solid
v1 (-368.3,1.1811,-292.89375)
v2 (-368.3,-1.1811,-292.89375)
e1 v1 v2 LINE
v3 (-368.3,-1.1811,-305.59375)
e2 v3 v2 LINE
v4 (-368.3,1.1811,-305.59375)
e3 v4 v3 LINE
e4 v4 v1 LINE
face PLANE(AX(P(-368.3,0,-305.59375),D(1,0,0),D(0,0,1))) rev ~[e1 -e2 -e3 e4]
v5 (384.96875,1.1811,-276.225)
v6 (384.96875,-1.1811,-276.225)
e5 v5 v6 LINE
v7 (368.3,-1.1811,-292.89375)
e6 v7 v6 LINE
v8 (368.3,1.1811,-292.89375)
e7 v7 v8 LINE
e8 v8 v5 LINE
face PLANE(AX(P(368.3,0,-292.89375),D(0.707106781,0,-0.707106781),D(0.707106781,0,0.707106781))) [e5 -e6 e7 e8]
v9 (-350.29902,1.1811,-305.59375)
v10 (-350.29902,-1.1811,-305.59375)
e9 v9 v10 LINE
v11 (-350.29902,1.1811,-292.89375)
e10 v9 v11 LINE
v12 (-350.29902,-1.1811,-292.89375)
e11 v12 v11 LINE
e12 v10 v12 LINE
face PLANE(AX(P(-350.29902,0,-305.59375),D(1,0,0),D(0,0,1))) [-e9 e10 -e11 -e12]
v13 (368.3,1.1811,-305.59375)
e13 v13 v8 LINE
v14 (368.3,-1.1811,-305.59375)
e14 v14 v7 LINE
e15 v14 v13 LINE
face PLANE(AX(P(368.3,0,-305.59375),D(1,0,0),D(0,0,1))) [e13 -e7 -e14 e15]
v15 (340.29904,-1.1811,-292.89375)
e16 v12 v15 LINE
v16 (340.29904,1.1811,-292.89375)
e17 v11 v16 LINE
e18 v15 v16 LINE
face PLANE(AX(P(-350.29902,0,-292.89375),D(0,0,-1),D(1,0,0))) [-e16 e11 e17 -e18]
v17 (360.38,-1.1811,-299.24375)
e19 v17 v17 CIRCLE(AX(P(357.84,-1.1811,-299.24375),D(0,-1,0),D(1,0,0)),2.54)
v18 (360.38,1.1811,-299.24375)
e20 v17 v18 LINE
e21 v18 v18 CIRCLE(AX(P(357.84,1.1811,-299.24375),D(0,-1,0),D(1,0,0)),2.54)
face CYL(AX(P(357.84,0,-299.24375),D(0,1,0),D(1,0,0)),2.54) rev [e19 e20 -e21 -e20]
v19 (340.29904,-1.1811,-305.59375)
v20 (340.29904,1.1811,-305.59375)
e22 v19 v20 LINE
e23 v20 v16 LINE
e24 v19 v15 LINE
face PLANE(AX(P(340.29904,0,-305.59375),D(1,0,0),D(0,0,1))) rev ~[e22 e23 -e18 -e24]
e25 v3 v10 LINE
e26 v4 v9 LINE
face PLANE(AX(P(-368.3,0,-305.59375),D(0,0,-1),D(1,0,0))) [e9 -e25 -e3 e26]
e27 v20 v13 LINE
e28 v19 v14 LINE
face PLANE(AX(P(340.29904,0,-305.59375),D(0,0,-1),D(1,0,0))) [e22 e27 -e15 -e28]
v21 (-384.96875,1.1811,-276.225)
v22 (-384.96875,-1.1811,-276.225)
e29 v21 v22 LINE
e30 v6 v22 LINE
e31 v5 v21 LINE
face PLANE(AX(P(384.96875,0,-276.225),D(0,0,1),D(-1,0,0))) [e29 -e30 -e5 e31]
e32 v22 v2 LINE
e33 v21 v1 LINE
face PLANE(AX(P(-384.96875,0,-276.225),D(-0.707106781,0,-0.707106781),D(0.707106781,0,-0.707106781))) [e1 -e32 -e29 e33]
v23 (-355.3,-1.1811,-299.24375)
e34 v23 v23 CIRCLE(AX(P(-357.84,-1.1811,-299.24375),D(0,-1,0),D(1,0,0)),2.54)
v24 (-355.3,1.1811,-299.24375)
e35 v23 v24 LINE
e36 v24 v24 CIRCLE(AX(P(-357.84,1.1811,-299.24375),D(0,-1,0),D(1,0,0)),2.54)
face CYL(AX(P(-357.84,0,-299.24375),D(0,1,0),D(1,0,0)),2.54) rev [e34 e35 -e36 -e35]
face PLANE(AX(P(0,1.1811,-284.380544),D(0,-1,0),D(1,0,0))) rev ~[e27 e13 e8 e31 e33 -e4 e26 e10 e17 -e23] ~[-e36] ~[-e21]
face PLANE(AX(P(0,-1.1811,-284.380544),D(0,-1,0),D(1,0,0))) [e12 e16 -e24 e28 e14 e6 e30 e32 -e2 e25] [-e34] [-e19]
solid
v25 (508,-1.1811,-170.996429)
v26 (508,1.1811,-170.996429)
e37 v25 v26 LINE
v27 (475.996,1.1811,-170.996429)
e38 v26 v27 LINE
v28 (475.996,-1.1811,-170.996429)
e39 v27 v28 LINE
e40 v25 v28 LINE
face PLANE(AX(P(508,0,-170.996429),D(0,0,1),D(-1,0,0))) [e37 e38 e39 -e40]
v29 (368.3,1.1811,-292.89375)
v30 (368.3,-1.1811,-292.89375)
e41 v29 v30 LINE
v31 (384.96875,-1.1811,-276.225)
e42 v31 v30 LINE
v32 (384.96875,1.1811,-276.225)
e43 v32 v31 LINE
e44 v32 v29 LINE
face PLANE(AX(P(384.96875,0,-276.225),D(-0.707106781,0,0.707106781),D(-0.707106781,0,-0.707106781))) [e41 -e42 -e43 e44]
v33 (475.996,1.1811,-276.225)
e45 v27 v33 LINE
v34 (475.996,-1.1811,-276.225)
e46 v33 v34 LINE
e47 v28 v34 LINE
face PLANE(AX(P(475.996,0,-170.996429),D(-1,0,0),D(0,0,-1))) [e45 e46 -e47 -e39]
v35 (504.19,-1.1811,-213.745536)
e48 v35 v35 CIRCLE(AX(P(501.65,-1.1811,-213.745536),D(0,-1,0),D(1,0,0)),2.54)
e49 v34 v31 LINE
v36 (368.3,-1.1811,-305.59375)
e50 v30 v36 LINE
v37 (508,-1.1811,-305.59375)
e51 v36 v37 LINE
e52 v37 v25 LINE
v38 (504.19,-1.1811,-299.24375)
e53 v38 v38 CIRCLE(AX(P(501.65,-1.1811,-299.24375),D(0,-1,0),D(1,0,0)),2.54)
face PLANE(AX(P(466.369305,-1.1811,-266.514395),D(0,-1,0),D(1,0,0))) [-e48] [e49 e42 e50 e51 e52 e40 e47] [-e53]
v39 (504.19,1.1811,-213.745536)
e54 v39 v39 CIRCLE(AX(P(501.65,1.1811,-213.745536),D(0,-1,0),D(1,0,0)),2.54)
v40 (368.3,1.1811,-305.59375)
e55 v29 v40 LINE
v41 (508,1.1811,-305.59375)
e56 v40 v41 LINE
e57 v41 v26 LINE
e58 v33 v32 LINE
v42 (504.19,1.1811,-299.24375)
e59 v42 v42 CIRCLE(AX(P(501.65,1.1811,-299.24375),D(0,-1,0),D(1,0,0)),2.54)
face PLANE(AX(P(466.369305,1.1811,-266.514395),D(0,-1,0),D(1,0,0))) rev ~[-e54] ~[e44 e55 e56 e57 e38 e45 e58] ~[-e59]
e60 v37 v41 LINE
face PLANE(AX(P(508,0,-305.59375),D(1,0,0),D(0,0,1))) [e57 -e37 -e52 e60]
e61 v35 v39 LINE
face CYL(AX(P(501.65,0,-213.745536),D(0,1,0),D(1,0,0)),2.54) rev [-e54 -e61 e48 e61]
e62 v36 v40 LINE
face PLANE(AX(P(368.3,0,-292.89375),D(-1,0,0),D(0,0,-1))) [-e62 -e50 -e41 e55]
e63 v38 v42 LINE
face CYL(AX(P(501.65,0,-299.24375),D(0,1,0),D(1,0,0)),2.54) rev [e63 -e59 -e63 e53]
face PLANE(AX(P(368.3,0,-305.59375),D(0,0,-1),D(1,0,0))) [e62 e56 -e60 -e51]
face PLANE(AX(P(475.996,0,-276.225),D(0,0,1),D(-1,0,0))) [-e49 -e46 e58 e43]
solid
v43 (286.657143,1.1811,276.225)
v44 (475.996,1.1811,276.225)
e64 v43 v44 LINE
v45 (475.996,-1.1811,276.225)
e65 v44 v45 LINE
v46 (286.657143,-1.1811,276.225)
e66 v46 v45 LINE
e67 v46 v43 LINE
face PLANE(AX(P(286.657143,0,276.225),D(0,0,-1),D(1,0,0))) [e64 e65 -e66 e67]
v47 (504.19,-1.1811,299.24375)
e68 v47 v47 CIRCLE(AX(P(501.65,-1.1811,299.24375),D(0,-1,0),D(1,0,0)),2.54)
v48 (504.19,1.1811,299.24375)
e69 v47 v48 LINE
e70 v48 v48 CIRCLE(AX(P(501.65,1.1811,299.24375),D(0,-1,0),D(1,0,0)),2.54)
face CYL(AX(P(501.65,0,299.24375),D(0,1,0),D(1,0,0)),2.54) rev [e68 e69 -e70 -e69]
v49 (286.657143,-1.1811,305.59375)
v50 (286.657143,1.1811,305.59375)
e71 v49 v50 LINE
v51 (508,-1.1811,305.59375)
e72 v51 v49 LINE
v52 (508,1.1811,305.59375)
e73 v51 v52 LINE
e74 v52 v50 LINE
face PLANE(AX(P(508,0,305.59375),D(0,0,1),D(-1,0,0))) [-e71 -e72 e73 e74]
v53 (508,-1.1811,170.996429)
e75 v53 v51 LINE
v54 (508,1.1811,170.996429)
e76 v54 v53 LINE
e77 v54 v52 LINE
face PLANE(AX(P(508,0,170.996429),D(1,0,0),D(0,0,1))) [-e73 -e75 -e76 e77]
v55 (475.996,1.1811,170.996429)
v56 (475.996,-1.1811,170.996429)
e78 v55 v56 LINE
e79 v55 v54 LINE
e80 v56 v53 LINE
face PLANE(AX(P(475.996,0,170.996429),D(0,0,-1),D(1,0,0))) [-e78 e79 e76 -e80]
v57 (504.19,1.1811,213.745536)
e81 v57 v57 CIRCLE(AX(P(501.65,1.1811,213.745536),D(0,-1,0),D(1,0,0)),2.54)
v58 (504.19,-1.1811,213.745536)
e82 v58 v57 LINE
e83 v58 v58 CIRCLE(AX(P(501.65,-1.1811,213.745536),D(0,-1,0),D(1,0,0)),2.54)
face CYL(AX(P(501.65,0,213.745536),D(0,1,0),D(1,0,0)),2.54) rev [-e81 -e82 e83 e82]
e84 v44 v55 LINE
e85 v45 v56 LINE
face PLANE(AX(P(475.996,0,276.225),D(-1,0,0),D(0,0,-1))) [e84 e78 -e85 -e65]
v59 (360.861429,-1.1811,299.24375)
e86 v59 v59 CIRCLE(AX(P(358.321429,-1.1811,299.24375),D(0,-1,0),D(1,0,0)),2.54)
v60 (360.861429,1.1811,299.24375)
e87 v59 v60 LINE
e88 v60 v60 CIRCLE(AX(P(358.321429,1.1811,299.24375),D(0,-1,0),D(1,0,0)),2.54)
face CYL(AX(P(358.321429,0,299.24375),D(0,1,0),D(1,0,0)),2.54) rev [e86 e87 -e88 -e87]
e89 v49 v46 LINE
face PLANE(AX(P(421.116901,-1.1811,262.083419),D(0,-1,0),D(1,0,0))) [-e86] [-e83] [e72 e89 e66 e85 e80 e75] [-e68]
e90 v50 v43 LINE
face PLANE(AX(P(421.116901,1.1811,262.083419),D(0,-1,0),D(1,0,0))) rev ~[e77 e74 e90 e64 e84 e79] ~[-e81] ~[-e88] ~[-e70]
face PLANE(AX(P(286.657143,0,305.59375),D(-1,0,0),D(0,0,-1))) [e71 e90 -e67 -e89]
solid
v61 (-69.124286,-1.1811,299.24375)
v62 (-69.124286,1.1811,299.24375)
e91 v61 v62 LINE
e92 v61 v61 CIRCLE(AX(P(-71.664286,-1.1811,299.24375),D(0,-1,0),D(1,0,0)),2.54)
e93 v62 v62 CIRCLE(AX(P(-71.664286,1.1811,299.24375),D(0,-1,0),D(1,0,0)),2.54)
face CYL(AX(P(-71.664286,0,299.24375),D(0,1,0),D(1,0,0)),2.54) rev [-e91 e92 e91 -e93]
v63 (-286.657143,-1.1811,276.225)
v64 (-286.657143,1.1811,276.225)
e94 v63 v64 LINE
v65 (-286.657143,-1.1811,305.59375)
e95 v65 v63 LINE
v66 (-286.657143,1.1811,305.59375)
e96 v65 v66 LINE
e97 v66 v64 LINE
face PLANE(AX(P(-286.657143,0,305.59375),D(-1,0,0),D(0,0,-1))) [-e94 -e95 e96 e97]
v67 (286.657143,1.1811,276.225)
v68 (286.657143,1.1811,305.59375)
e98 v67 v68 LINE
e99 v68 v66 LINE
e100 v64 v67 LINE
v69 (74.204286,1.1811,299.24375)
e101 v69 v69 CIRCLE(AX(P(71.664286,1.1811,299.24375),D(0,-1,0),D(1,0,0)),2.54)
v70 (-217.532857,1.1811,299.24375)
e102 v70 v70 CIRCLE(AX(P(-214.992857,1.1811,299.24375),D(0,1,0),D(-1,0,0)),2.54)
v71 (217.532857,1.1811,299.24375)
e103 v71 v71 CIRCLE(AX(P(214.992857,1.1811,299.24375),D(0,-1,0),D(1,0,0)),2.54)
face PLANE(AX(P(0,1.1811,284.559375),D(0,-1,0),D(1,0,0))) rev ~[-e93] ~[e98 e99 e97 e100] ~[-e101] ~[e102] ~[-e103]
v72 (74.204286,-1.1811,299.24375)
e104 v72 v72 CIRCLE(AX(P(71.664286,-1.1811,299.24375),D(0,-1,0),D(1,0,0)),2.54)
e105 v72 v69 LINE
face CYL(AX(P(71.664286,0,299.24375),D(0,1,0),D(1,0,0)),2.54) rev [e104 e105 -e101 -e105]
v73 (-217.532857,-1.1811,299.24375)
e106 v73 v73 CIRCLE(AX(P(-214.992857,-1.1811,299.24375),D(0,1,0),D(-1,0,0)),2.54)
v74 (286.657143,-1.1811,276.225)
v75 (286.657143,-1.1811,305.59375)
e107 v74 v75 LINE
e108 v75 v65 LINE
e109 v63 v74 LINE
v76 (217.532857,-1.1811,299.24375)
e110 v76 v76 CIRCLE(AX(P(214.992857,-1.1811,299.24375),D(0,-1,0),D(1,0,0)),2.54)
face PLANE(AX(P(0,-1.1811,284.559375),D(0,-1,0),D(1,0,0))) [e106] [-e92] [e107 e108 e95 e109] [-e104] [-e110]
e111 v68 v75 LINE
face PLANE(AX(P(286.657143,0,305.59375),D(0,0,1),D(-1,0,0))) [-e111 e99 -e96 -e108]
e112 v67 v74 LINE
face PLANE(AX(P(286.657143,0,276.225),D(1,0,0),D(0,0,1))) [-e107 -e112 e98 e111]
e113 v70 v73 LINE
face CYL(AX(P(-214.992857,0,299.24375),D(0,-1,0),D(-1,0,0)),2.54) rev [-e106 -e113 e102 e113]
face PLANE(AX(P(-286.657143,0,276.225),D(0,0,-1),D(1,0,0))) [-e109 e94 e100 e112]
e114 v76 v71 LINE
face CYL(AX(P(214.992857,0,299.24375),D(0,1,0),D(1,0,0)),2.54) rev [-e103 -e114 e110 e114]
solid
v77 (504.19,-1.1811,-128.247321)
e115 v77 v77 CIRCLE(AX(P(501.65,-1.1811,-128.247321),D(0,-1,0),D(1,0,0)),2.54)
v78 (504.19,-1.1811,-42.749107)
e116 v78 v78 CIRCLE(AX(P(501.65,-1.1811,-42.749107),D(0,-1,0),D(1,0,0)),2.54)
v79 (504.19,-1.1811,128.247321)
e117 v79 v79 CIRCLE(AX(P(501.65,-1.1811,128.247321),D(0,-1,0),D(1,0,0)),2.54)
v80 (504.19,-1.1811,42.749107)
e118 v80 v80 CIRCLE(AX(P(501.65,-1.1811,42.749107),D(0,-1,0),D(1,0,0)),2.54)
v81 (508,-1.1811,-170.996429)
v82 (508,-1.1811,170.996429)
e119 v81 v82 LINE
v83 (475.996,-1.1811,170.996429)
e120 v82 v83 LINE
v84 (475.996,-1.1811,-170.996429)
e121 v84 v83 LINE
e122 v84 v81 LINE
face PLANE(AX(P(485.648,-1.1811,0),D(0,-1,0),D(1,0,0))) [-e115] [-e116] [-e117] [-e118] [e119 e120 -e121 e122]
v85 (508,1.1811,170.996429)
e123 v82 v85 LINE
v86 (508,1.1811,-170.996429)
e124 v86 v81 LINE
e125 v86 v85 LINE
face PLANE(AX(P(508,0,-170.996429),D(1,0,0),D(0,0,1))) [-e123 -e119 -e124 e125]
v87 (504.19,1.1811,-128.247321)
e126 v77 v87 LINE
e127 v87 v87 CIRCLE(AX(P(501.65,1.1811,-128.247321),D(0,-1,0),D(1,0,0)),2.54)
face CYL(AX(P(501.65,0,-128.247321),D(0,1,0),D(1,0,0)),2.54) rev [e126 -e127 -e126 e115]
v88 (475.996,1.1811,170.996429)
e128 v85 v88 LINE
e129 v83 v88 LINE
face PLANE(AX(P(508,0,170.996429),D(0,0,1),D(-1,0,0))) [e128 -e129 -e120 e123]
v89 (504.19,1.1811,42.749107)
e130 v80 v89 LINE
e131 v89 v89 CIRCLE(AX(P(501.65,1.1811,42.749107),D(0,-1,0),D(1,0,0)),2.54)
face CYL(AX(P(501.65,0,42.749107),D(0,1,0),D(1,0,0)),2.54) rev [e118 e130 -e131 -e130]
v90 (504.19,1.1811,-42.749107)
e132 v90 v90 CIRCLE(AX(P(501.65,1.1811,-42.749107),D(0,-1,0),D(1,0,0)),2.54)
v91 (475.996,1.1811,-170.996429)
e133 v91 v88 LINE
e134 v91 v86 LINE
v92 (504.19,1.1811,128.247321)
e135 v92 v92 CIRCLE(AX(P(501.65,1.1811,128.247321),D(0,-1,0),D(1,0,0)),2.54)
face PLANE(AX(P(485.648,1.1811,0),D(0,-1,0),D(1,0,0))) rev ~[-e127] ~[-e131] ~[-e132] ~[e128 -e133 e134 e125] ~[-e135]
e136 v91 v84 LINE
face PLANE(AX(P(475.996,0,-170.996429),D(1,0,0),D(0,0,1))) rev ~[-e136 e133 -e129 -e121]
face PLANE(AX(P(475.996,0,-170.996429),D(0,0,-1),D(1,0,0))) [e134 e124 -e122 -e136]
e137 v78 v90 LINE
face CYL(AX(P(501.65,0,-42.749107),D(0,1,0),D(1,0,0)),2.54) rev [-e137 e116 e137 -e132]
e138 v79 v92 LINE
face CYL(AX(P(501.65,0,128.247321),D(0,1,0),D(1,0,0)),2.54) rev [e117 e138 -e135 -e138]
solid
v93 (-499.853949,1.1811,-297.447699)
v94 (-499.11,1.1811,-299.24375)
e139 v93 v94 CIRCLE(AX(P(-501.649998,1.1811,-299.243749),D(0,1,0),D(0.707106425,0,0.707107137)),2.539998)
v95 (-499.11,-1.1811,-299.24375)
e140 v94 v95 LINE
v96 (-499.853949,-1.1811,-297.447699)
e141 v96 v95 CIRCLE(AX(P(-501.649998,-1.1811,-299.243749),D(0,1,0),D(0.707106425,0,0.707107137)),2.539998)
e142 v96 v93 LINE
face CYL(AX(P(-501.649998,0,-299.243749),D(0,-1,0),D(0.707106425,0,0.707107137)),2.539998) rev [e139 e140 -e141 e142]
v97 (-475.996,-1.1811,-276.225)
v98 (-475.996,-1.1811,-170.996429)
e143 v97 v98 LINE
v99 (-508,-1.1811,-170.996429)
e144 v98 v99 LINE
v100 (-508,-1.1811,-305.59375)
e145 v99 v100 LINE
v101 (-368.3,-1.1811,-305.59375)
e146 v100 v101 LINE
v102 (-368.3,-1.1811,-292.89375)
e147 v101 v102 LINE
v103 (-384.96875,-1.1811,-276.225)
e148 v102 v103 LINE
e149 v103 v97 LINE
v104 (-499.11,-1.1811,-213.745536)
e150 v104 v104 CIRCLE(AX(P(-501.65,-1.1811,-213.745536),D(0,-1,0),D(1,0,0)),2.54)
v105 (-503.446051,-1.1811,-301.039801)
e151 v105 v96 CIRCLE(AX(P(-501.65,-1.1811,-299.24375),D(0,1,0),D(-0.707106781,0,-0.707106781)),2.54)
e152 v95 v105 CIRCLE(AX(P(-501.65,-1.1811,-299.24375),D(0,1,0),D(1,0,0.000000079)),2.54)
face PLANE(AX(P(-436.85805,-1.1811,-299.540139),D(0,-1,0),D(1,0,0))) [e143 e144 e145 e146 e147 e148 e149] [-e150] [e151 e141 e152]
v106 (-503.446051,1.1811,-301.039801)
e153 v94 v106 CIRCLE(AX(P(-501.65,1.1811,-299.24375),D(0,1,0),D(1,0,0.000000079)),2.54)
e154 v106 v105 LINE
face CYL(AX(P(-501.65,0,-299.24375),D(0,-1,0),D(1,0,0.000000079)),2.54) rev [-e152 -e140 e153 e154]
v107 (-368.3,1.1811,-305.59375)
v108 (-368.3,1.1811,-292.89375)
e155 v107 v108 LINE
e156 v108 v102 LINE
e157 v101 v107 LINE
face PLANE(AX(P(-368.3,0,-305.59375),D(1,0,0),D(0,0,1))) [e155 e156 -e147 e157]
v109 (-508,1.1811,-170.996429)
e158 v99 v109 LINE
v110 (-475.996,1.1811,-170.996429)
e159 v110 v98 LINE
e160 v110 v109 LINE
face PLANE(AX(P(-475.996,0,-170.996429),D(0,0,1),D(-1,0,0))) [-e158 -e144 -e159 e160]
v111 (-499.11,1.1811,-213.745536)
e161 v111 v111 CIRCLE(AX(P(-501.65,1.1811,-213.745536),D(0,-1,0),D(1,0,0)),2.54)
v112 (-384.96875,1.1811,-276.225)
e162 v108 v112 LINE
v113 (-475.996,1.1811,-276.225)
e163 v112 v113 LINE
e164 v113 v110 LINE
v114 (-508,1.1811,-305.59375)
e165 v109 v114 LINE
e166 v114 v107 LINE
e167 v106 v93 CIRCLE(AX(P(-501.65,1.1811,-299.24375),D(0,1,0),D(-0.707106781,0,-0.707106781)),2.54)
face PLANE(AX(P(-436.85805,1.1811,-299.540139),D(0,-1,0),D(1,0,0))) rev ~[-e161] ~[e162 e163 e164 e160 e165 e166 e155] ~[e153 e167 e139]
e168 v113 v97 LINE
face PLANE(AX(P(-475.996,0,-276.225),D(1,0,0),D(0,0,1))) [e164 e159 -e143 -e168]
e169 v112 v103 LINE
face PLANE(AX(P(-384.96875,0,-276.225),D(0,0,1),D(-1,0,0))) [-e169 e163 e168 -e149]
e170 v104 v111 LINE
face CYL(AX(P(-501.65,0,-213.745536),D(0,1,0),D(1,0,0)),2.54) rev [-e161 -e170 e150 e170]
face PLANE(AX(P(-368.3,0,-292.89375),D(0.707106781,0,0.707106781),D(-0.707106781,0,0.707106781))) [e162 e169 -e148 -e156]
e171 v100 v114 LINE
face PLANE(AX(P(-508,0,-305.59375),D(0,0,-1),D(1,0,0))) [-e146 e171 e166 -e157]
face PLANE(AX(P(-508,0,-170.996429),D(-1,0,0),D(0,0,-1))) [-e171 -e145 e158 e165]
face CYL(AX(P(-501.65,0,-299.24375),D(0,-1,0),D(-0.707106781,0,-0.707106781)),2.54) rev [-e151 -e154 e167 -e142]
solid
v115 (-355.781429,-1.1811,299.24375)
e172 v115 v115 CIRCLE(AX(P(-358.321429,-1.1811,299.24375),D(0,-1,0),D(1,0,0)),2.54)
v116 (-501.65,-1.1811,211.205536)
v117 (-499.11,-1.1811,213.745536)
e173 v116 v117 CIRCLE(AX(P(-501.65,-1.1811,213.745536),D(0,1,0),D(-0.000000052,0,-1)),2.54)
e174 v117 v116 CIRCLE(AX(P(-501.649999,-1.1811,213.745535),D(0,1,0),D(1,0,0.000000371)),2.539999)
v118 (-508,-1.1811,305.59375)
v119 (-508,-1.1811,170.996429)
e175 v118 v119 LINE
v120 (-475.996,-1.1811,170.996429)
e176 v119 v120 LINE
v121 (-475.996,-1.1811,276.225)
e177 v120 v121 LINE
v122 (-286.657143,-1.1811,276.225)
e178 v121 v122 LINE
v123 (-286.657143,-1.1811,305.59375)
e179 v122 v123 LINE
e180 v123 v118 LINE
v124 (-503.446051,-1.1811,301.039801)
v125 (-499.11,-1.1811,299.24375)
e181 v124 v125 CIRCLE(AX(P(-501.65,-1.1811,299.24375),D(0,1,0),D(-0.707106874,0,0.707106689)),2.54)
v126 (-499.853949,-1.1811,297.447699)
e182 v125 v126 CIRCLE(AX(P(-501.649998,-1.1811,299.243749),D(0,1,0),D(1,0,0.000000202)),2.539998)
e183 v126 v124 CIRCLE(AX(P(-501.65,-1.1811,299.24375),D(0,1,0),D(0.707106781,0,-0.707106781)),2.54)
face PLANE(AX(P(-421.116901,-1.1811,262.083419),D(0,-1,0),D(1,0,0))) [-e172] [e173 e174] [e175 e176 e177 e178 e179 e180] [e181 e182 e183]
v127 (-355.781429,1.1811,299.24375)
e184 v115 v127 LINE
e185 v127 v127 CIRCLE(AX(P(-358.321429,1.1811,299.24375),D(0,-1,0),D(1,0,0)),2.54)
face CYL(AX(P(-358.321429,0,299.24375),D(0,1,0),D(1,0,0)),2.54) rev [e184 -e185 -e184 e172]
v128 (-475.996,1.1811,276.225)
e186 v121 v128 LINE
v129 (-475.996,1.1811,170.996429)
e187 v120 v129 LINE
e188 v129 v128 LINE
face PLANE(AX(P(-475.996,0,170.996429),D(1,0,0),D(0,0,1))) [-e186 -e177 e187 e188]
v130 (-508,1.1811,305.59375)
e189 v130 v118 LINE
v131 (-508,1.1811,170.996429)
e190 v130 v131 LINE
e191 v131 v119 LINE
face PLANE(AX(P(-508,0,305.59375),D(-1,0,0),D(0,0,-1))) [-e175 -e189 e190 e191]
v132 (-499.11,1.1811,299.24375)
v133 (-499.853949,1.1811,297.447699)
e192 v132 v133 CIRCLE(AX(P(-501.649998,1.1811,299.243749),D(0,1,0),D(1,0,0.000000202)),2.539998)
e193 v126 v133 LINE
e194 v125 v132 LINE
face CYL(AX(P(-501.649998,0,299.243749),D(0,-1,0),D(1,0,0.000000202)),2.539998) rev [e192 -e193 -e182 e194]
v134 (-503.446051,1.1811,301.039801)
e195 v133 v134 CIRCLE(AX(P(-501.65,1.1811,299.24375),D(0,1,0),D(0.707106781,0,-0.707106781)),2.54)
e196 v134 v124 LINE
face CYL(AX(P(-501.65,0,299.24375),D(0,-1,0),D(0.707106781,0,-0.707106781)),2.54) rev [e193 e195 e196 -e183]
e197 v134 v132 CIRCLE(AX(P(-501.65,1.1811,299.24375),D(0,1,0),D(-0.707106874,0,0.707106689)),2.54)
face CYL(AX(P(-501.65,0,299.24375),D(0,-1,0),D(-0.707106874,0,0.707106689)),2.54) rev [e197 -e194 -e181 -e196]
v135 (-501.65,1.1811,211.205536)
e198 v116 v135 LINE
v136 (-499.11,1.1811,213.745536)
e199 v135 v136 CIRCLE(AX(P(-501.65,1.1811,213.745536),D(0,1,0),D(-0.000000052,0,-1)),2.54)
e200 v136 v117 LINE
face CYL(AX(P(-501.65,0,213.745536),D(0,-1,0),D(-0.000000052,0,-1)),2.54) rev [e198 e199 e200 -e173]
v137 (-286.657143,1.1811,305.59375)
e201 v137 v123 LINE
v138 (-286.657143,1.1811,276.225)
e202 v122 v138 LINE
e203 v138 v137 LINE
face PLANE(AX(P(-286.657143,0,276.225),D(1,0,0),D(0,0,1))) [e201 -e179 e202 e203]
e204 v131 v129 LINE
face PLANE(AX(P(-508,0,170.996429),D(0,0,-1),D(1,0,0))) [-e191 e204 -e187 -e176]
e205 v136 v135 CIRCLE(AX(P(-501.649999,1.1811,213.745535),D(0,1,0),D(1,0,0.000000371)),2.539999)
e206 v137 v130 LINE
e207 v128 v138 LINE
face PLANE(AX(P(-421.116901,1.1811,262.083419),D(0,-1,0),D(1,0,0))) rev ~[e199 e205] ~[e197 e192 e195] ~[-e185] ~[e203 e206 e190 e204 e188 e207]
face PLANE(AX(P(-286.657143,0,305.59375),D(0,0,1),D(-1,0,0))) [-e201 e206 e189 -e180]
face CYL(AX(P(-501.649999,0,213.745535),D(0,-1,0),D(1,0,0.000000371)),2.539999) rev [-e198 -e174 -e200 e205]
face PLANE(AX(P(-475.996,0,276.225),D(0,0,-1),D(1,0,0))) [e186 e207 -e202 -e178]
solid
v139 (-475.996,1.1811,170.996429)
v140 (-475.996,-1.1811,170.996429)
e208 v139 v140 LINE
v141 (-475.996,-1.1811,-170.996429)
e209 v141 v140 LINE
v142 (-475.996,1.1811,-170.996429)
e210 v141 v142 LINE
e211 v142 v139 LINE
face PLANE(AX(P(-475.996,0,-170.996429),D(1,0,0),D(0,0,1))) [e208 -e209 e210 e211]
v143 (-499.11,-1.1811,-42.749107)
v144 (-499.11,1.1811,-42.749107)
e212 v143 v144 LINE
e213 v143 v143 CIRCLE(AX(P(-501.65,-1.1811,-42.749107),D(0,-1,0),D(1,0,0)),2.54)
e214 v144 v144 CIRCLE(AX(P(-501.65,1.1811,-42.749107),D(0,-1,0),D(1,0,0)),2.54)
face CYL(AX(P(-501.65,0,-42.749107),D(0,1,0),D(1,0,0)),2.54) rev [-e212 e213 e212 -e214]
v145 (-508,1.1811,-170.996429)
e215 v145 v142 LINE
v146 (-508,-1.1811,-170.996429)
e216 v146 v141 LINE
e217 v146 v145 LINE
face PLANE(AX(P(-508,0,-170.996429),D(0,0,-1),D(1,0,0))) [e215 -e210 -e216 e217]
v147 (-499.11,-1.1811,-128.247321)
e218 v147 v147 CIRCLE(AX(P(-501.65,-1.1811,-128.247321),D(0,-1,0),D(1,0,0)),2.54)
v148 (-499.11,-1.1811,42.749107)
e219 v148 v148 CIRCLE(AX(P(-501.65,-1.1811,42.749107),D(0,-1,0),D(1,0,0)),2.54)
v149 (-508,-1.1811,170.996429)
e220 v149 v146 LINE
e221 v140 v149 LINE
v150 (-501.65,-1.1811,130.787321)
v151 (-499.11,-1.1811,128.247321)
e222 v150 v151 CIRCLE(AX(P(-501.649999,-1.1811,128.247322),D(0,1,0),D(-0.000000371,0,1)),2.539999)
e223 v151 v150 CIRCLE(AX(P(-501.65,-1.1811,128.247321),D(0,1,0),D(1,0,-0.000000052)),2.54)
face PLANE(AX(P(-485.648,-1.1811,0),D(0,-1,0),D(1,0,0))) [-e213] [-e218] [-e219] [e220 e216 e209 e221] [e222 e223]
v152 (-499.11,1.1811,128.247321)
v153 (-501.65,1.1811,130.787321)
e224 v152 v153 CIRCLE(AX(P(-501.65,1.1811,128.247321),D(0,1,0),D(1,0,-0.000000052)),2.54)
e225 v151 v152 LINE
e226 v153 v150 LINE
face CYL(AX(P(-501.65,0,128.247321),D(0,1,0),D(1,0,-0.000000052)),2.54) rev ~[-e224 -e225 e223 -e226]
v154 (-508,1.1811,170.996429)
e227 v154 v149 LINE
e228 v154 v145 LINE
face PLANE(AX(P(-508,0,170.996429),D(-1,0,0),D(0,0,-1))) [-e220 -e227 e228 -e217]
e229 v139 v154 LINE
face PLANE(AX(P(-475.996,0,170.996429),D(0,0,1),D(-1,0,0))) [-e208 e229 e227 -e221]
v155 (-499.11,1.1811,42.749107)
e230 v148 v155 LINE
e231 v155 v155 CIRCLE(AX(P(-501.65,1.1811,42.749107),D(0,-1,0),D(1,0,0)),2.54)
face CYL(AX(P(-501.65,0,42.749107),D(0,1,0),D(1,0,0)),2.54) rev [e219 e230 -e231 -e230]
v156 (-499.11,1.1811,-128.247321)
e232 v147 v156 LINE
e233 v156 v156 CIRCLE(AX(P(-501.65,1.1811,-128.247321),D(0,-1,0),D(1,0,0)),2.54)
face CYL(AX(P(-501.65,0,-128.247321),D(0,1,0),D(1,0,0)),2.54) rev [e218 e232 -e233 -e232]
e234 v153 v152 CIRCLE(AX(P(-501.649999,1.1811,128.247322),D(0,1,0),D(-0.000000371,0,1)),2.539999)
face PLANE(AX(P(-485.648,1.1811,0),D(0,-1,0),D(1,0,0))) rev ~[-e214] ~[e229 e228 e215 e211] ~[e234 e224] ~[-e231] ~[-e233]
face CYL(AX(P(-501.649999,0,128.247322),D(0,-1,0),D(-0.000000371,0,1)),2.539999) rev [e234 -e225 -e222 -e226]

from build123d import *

# Parameters (mm, degrees)
F0_R     = 2.54
F1_DEPTH = 1.1811
F0_W     = 573.314286
F0_H     = 16.66875
F2_DEPTH = 1.1811
F3_DEPTH = 1.1811
F0_W_2   = 19.304
F0_H_2   = 341.992858
F0_W_3   = 12.7
F4_DEPTH = 1.1811
F5_DEPTH = 1.1811
F0_W_4   = 28.00096
F0_H_3   = 12.7
F0_W_5   = 18.00098
F6_DEPTH = 1.1811
F7_DEPTH = 1.1811
F8_DEPTH = 1.1811


# Not quite as in the source:
# - a feature names something its author has since deleted; it is built from what else it names


with BuildPart() as f1:
    # F0 (on Front) → F1 (new body, symmetric)
    with BuildSketch(Plane.XZ):
        Polygon((-286.657143, 276.225), (-286.657143, 292.89375), (-495.3, 292.89375), (-495.3, 170.996429), (-475.996, 170.996429), (-475.996, 276.225), align=None)
        with BuildLine():
            Line((-495.3, 170.996429), (-495.3, 292.89375))
            Line((-495.3, 292.89375), (-499.853949, 297.447699))
            ThreePointArc((-499.853949, 297.447699), (-503.446051, 297.447699), (-503.446051, 301.039801))
            Line((-503.446051, 301.039801), (-508, 305.59375))
            Line((-508, 305.59375), (-508, 170.996429))
            Line((-508, 170.996429), (-501.65, 170.996429))
            Line((-501.65, 170.996429), (-495.3, 170.996429))
        make_face()
        with BuildLine():
            ThreePointArc((-499.11, 213.745536), (-499.853949, 211.949484), (-501.65, 211.205536))
            ThreePointArc((-501.65, 211.205536), (-503.446051, 215.541587), (-499.11, 213.745536))
        make_face(mode=Mode.SUBTRACT)
        with BuildLine():
            Line((-495.3, 292.89375), (-286.657143, 292.89375))
            Line((-286.657143, 292.89375), (-286.657143, 299.24375))
            Line((-286.657143, 299.24375), (-286.657143, 305.59375))
            Line((-286.657143, 305.59375), (-508, 305.59375))
            Line((-508, 305.59375), (-503.446051, 301.039801))
            ThreePointArc((-503.446051, 301.039801), (-500.677984, 301.590404), (-499.11, 299.24375))
            ThreePointArc((-499.11, 299.24375), (-499.303346, 298.271734), (-499.853949, 297.447699))
            Line((-499.853949, 297.447699), (-495.3, 292.89375))
        make_face()
        with Locations((-358.321429, 299.24375)):
            Circle(F0_R, mode=Mode.SUBTRACT)
    extrude(amount=F1_DEPTH, both=True)


with BuildPart() as f2:
    # F0 (on Front) → F2 (new body, symmetric)
    with BuildSketch(Plane.XZ):
        with Locations((0, 284.559375)):
            Rectangle(F0_W, F0_H)
        Polygon((-286.657143, 292.89375), (286.657143, 292.89375), (286.657143, 305.59375), (-286.657143, 305.59375), (-286.657143, 299.24375), align=None)
        with BuildLine():
            ThreePointArc((-212.452857, 299.24375), (-214.992857, 296.70375), (-217.532857, 299.24375))
            ThreePointArc((-217.532857, 299.24375), (-214.992857, 301.78375), (-212.452857, 299.24375))
        make_face(mode=Mode.SUBTRACT)
        with Locations((-71.664286, 299.24375)):
            Circle(F0_R, mode=Mode.SUBTRACT)
        with Locations((71.664286, 299.24375)):
            Circle(F0_R, mode=Mode.SUBTRACT)
        with Locations((214.992857, 299.24375)):
            Circle(F0_R, mode=Mode.SUBTRACT)
    extrude(amount=F2_DEPTH, both=True)


with BuildPart() as f3:
    # F0 (on Front) → F3 (new body, symmetric)
    with BuildSketch(Plane.XZ):
        Polygon((495.3, 170.996429), (495.3, 292.89375), (286.657143, 292.89375), (286.657143, 276.225), (475.996, 276.225), (475.996, 170.996429), align=None)
        Polygon((286.657143, 292.89375), (495.3, 292.89375), (495.3, 170.996429), (508, 170.996429), (508, 305.59375), (286.657143, 305.59375), align=None)
        with Locations((501.65, 213.745536)):
            Circle(F0_R, mode=Mode.SUBTRACT)
        with Locations((358.321429, 299.24375)):
            Circle(F0_R, mode=Mode.SUBTRACT)
        with Locations((501.65, 299.24375)):
            Circle(F0_R, mode=Mode.SUBTRACT)
    extrude(amount=F3_DEPTH, both=True)


with BuildPart() as f4:
    # F0 (on Front) → F4 (new body, symmetric)
    with BuildSketch(Plane.XZ):
        with Locations((485.648, 0)):
            Rectangle(F0_W_2, F0_H_2)
        with Locations((501.65, 0)):
            Rectangle(F0_W_3, F0_H_2)
        with Locations((501.65, -128.247321)):
            Circle(F0_R, mode=Mode.SUBTRACT)
        with Locations((501.65, -42.749107)):
            Circle(F0_R, mode=Mode.SUBTRACT)
        with Locations((501.65, 42.749107)):
            Circle(F0_R, mode=Mode.SUBTRACT)
        with Locations((501.65, 128.247321)):
            Circle(F0_R, mode=Mode.SUBTRACT)
    extrude(amount=F4_DEPTH, both=True)


with BuildPart() as f5:
    # F0 (on Front) → F5 (new body, symmetric)
    with BuildSketch(Plane.XZ):
        Polygon((508, -170.996429), (495.3, -170.996429), (495.3, -292.89375), (368.3, -292.89375), (368.3, -305.59375), (508, -305.59375), align=None)
        with Locations((501.65, -299.24375)):
            Circle(F0_R, mode=Mode.SUBTRACT)
        with Locations((501.65, -213.745536)):
            Circle(F0_R, mode=Mode.SUBTRACT)
        Polygon((495.3, -292.89375), (495.3, -170.996429), (475.996, -170.996429), (475.996, -276.225), (384.96875, -276.225), (368.3, -292.89375), align=None)
    extrude(amount=F5_DEPTH, both=True)


with BuildPart() as f6:
    # F0 (on Front) → F6 (new body, symmetric)
    with BuildSketch(Plane.XZ):
        Polygon((340.29904, -292.89375), (368.3, -292.89375), (384.96875, -276.225), (-384.96875, -276.225), (-368.3, -292.89375), (-350.29902, -292.89375), align=None)
        with Locations((354.29952, -299.24375)):
            Rectangle(F0_W_4, F0_H_3)
        with Locations((357.84, -299.24375)):
            Circle(F0_R, mode=Mode.SUBTRACT)
        with Locations((-359.29951, -299.24375)):
            Rectangle(F0_W_5, F0_H_3)
        with Locations((-357.84, -299.24375)):
            Circle(F0_R, mode=Mode.SUBTRACT)
    extrude(amount=F6_DEPTH, both=True)


with BuildPart() as f7:
    # F0 (on Front) → F7 (new body, symmetric)
    with BuildSketch(Plane.XZ):
        with BuildLine():
            Line((-368.3, -292.89375), (-495.3, -292.89375))
            Line((-495.3, -292.89375), (-499.853949, -297.447699))
            ThreePointArc((-499.853949, -297.447699), (-499.303346, -298.271734), (-499.11, -299.24375))
            ThreePointArc((-499.11, -299.24375), (-500.677984, -301.590404), (-503.446051, -301.039801))
            Line((-503.446051, -301.039801), (-508, -305.59375))
            Line((-508, -305.59375), (-368.3, -305.59375))
            Line((-368.3, -305.59375), (-368.3, -292.89375))
        make_face()
        with BuildLine():
            Line((-495.3, -292.89375), (-495.3, -170.996429))
            Line((-495.3, -170.996429), (-508, -170.996429))
            Line((-508, -170.996429), (-508, -305.59375))
            Line((-508, -305.59375), (-503.446051, -301.039801))
            ThreePointArc((-503.446051, -301.039801), (-503.446051, -297.447699), (-499.853949, -297.447699))
            Line((-499.853949, -297.447699), (-495.3, -292.89375))
        make_face()
        with Locations((-501.65, -213.745536)):
            Circle(F0_R, mode=Mode.SUBTRACT)
        Polygon((-475.996, -170.996429), (-495.3, -170.996429), (-495.3, -292.89375), (-368.3, -292.89375), (-384.96875, -276.225), (-475.996, -276.225), align=None)
    extrude(amount=F7_DEPTH, both=True)


with BuildPart() as f8:
    # F0 (on Front) → F8 (new body, symmetric)
    with BuildSketch(Plane.XZ):
        with Locations((-485.648, 0)):
            Rectangle(F0_W_2, F0_H_2)
        Polygon((-495.3, -170.996429), (-495.3, 170.996429), (-501.65, 170.996429), (-508, 170.996429), (-508, -170.996429), align=None)
        with Locations((-501.65, -128.247321)):
            Circle(F0_R, mode=Mode.SUBTRACT)
        with Locations((-501.65, -42.749107)):
            Circle(F0_R, mode=Mode.SUBTRACT)
        with Locations((-501.65, 42.749107)):
            Circle(F0_R, mode=Mode.SUBTRACT)
        with BuildLine():
            ThreePointArc((-499.11, 128.247321), (-503.446051, 126.45127), (-501.65, 130.787321))
            ThreePointArc((-501.65, 130.787321), (-499.853949, 130.043373), (-499.11, 128.247321))
        make_face(mode=Mode.SUBTRACT)
    extrude(amount=F8_DEPTH, both=True)


solid = Compound([f1.part, f2.part, f3.part, f4.part, f5.part, f6.part, f7.part, f8.part])
